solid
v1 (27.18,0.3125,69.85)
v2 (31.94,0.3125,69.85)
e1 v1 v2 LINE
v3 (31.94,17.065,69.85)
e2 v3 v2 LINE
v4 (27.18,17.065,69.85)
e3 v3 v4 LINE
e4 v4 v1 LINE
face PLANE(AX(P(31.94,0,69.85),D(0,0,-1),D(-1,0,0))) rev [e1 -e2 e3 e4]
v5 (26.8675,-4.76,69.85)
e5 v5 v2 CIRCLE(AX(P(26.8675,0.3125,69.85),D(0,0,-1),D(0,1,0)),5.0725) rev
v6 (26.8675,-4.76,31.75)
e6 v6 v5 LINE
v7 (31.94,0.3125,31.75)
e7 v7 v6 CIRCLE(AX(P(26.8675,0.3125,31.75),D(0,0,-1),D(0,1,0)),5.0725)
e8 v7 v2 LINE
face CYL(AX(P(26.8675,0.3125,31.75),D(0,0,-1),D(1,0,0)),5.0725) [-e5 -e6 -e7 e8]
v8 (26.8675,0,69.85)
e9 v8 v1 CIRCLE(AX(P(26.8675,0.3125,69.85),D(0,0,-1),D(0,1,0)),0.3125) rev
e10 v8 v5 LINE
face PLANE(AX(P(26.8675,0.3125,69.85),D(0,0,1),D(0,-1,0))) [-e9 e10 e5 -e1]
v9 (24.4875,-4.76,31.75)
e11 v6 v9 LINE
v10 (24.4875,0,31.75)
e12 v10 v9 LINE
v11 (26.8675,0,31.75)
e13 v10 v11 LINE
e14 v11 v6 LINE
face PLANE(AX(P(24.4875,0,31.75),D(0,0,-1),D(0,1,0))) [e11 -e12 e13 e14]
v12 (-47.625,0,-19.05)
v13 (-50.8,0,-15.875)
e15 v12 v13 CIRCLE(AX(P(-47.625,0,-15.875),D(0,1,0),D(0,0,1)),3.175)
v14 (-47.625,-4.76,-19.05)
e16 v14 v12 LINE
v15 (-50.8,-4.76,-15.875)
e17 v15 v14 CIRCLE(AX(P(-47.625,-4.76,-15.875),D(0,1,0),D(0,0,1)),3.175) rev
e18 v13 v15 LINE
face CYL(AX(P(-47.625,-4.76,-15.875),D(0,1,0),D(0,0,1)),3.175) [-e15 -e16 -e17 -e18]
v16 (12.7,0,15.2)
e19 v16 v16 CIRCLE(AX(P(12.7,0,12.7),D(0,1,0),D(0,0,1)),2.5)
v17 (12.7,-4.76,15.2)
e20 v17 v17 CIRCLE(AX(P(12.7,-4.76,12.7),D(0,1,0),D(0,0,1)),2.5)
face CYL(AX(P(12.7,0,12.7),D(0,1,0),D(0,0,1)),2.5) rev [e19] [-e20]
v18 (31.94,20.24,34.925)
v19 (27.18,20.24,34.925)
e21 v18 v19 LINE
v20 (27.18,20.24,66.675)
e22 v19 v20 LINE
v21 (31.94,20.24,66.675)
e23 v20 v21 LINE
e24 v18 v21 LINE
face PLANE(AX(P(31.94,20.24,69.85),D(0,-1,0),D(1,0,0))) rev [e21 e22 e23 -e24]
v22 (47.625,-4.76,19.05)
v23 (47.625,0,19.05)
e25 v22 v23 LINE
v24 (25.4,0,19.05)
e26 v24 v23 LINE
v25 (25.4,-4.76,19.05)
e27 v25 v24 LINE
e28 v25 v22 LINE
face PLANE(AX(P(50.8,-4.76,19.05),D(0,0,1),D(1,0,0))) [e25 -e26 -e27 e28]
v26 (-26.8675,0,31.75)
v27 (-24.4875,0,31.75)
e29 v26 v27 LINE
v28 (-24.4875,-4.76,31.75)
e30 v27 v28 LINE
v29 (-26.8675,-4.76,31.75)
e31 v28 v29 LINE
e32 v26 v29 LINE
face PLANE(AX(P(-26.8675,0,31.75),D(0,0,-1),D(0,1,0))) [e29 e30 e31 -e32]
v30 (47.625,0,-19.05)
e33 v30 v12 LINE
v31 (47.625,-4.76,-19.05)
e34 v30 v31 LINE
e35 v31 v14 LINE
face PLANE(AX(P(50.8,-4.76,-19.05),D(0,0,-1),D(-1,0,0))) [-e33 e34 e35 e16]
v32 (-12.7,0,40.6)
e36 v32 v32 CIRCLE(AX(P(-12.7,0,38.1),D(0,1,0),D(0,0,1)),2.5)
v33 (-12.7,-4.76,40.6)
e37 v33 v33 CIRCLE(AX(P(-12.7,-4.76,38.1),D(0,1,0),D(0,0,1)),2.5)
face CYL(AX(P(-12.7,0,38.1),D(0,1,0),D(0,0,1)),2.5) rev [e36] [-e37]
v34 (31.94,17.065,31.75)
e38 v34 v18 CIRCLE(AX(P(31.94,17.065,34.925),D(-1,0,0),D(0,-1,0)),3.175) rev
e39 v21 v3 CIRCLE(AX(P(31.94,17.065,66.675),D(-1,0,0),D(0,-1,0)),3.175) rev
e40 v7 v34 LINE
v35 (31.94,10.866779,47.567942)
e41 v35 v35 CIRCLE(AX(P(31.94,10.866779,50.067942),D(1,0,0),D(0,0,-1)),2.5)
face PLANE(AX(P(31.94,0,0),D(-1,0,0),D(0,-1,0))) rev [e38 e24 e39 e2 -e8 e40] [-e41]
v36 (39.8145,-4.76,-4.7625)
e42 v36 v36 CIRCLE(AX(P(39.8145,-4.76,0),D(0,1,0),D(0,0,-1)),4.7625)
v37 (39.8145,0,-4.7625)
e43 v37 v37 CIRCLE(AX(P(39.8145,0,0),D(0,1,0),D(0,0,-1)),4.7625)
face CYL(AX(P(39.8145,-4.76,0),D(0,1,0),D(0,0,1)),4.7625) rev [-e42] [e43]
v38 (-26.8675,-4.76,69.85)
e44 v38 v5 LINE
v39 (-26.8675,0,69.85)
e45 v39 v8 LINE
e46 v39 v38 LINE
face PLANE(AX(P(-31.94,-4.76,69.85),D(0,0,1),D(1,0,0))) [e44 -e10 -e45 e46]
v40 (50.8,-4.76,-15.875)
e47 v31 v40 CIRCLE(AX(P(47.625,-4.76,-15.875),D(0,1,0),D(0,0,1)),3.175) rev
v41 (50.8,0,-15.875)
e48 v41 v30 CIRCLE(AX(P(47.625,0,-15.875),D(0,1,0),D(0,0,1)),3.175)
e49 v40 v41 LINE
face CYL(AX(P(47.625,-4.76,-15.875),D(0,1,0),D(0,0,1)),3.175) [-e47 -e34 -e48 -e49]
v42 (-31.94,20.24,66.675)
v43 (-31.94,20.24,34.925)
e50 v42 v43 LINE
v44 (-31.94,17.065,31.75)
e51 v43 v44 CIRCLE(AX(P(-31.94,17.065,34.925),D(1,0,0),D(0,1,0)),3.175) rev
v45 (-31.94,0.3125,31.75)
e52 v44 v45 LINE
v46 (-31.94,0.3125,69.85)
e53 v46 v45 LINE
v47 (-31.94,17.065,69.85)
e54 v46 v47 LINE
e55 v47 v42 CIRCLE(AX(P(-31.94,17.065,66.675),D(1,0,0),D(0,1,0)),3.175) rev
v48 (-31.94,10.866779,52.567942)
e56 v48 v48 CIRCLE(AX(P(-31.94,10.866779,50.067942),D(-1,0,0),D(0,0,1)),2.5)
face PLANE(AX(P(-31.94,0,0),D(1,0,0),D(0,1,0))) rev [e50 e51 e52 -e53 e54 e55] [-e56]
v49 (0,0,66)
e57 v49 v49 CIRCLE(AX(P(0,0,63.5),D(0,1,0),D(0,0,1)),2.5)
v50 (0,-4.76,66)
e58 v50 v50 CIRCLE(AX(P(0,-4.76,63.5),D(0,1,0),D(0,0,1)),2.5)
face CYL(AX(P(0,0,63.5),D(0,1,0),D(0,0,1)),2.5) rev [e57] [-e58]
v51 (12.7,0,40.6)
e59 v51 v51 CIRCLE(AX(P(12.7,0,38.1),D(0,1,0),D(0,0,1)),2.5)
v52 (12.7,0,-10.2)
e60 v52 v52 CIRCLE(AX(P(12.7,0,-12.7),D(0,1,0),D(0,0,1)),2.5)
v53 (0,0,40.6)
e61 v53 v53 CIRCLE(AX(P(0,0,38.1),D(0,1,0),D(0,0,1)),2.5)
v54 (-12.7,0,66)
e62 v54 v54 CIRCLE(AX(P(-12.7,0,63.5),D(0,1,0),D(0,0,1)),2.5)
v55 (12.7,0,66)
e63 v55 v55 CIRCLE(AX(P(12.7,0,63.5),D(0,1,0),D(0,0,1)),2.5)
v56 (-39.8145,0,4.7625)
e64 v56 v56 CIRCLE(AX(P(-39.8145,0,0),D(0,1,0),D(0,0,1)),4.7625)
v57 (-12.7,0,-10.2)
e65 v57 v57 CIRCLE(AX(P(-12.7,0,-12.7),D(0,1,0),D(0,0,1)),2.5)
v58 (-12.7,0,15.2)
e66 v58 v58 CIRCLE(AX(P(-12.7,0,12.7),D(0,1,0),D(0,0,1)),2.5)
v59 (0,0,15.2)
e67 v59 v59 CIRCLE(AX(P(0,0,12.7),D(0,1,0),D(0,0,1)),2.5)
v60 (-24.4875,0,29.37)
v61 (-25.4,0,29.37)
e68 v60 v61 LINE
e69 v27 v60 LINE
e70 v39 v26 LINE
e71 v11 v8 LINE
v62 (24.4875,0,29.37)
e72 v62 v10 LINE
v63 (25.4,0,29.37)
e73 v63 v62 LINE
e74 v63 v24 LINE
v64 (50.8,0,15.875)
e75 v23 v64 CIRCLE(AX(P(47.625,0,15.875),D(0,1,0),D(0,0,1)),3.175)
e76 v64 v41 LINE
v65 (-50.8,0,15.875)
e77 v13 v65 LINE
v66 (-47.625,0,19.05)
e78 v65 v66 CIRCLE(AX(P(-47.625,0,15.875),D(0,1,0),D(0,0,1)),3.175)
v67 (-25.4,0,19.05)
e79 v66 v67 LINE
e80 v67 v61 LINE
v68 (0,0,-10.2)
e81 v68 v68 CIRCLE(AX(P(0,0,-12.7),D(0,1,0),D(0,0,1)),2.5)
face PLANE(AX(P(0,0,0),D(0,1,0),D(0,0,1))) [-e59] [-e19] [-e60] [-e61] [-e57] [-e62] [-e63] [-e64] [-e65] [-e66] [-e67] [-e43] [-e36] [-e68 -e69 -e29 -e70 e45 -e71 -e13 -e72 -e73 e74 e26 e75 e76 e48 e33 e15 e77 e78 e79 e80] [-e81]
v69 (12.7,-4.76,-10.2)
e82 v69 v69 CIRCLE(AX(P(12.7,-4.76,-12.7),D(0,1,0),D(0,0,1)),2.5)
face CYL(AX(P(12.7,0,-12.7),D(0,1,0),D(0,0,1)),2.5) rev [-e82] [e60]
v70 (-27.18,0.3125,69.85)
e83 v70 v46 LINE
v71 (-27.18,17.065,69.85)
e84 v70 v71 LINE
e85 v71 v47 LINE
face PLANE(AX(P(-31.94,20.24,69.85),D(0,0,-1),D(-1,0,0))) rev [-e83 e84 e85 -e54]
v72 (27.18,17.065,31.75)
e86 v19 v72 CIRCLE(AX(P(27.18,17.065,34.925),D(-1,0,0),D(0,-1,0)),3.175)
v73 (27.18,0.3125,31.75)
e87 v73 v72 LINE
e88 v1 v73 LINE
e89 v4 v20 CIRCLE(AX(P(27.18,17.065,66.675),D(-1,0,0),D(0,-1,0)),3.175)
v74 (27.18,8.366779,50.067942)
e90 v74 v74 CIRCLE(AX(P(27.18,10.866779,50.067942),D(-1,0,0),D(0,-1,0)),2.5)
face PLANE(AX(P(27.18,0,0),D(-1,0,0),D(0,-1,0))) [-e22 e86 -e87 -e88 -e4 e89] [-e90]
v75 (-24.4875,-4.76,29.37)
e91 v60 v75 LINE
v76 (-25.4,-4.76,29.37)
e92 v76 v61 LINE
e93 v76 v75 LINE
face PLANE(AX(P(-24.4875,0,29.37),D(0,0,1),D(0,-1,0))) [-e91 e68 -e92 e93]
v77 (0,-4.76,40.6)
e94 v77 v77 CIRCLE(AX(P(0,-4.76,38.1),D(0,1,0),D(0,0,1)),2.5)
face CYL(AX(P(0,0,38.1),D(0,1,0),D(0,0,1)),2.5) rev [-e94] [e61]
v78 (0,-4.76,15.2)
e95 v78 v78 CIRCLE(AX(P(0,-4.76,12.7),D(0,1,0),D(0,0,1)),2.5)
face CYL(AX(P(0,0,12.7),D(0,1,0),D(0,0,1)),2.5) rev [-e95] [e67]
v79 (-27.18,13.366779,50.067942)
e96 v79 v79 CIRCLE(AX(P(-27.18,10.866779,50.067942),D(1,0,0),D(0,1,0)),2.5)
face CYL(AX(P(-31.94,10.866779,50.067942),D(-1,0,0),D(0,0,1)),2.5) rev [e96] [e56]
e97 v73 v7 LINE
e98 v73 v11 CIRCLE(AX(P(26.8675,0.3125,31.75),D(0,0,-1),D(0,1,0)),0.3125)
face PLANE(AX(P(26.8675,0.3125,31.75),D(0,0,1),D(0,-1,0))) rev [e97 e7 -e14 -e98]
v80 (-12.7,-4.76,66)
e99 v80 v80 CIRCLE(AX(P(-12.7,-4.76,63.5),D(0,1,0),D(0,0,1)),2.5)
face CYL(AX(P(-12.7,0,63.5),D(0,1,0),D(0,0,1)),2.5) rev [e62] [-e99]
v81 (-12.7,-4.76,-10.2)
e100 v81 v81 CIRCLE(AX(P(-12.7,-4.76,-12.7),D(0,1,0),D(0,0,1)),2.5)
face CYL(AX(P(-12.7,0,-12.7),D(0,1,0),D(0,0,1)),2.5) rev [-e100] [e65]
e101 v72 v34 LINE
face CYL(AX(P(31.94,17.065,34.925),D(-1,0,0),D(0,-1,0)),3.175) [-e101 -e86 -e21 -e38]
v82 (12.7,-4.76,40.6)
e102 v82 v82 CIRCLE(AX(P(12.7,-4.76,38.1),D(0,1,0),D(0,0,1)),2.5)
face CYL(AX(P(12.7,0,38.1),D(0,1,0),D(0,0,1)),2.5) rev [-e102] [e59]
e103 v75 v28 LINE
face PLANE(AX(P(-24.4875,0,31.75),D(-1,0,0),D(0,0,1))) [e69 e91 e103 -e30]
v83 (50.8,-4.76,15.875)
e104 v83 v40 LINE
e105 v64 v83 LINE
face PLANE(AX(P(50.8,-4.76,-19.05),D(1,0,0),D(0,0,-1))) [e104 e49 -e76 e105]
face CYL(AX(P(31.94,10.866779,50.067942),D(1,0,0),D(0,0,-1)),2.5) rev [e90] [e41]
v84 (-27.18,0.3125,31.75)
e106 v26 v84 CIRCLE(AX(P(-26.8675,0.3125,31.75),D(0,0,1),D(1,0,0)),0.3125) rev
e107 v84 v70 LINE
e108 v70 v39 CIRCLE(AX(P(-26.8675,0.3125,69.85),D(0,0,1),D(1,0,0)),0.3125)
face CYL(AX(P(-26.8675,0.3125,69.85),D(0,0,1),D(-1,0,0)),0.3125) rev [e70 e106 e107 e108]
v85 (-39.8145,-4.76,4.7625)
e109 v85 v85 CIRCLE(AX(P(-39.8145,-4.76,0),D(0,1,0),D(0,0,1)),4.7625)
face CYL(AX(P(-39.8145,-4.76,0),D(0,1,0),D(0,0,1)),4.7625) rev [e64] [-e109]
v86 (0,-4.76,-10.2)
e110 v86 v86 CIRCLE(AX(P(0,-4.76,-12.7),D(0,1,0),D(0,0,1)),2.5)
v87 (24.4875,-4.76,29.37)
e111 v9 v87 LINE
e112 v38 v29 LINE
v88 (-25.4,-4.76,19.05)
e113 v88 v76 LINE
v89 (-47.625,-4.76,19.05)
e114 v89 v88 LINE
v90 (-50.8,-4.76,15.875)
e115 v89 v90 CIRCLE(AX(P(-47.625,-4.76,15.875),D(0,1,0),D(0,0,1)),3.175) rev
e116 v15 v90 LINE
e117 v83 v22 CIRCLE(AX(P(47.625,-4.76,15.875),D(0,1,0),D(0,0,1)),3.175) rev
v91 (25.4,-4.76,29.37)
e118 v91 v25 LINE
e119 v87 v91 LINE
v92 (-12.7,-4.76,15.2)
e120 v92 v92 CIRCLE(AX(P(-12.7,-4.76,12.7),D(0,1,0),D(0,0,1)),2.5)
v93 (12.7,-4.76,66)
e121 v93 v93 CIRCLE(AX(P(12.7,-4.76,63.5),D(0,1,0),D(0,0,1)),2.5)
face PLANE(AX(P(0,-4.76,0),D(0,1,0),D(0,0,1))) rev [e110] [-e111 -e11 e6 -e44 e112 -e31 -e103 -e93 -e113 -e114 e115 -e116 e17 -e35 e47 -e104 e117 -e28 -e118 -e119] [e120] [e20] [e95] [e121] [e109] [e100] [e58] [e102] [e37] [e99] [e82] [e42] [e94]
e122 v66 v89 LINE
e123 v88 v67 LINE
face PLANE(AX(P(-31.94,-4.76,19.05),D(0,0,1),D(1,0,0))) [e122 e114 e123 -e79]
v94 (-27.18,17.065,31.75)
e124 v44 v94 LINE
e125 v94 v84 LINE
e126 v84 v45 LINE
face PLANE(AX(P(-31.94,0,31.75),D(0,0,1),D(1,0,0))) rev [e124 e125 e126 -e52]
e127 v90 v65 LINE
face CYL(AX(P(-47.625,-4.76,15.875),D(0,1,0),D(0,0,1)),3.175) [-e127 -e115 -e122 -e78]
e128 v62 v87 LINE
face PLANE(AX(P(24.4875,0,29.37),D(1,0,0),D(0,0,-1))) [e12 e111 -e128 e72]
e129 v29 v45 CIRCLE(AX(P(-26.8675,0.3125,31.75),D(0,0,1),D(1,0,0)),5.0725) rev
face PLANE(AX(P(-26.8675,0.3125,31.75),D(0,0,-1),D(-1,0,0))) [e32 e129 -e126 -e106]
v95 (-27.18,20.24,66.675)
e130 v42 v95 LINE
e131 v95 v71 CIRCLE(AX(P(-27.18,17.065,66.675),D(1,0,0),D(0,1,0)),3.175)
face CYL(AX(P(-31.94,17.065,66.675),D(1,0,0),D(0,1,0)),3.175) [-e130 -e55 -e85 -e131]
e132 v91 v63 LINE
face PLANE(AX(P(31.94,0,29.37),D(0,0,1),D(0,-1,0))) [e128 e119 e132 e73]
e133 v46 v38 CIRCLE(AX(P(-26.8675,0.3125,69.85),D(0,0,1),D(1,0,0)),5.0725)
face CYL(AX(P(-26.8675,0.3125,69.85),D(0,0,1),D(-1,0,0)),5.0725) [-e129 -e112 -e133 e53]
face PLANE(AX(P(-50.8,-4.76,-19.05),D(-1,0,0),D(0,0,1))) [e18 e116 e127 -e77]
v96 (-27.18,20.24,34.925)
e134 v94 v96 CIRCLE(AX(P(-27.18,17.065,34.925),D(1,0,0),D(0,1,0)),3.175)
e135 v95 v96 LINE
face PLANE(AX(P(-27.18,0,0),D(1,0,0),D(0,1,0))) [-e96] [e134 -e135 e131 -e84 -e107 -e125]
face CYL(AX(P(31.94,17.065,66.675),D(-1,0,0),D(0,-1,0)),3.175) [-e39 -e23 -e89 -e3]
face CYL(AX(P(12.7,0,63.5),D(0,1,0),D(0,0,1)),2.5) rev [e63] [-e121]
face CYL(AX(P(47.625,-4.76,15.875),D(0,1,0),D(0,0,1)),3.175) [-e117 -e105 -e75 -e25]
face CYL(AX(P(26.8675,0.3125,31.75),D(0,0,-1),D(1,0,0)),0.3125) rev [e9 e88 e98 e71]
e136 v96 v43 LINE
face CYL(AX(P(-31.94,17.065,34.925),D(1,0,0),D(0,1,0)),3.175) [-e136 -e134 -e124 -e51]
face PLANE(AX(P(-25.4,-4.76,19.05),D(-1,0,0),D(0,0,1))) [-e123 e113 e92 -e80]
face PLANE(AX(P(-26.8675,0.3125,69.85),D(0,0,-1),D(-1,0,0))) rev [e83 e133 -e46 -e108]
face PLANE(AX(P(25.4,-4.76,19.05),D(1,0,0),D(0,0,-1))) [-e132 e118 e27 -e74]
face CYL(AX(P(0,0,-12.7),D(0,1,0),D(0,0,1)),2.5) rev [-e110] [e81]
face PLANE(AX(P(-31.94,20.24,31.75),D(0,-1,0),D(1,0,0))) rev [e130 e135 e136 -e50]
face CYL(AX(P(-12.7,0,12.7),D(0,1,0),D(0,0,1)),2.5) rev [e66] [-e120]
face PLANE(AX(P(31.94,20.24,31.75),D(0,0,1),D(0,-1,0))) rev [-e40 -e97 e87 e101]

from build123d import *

# Parameters (mm, degrees)
T_LE_DE_BASE_PLI_E1_DEPTH                = 4.76
T_LE_PLI_E_SUR_AR_TE1_STRIP_W            = 19.665
T_LE_PLI_E_SUR_AR_TE1_STRIP_H            = 4.76
T_LE_PLI_E_SUR_AR_TE1_STRIP_CUT_DEPTH    = 38.1
T_LE_PLI_E_SUR_AR_TE1_RELIEF_W           = 22.045
T_LE_PLI_E_SUR_AR_TE1_RELIEF_H           = 2.38
T_LE_PLI_E_SUR_AR_TE1_RELIEF_CUT_DEPTH   = 4.76
T_LE_PLI_E_SUR_AR_TE1_STRIP_2_W          = 19.665
T_LE_PLI_E_SUR_AR_TE1_STRIP_2_H          = 4.76
T_LE_PLI_E_SUR_AR_TE1_STRIP_CUT_2_DEPTH  = 38.1
T_LE_PLI_E_SUR_AR_TE1_RELIEF_2_W         = 22.045
T_LE_PLI_E_SUR_AR_TE1_RELIEF_2_H         = 2.38
T_LE_PLI_E_SUR_AR_TE1_RELIEF_CUT_2_DEPTH = 4.76
T_LE_PLI_E_SUR_AR_TE1_DEPTH              = 38.1
T_LE_PLI_E_SUR_AR_TE1_BEND_DEPTH         = 38.1
ENL_V_MAT_EXTRU_1_REACH                  = 90.709
ESQUISSE12_W                             = 6.54
ESQUISSE12_H                             = 10.32
CONG_1_R                                 = 3.175
ESQUISSE13_R                             = 4.7625
ENL_V_MAT_EXTRU_3_DEPTH                  = 89.709188363
DIAM_TRE_DU_PER_AGE_5_0_5_1_D            = 5
R_P_TITION_LIN_AIRE1_COUNT               = 4
R_P_TITION_LIN_AIRE1_PITCH               = 25.4
DIAM_TRE_DU_PER_AGE_5_0_5_2_D            = 5
DIAM_TRE_DU_PER_AGE_5_0_5_2_DEPTH        = 4.76
DIAM_TRE_DU_PER_AGE_5_0_5_3_D            = 5


# Sheet-metal steps are written as plain solids
with BuildPart() as part:
    # Esquisse1 → Tôle de base pliée1 (new body)
    with BuildSketch(Plane(origin=(0, 0, 0), x_dir=(1, 0, 0), z_dir=(0, 1, 0))):
        Polygon((-31.94, -19.05), (-31.94, -69.85), (31.94, -69.85), (31.94, -19.05), (50.8, -19.05), (50.8, 19.05), (-50.8, 19.05), (-50.8, -19.05), align=None)
    extrude(amount=-T_LE_DE_BASE_PLI_E1_DEPTH)

    # Tôle pliée sur arête1 strip (across the edge) → Tôle pliée sur arête1 strip cut (cut)
    with BuildSketch(Plane(origin=(-31.94, 0, 31.75), x_dir=(1, 0, 0), z_dir=(0, 0, 1))):
        with Locations((-4.76, -2.38)):
            Rectangle(T_LE_PLI_E_SUR_AR_TE1_STRIP_W, T_LE_PLI_E_SUR_AR_TE1_STRIP_H)
    extrude(amount=T_LE_PLI_E_SUR_AR_TE1_STRIP_CUT_DEPTH, mode=Mode.SUBTRACT)

    # Tôle pliée sur arête1 relief (on the sheet) → Tôle pliée sur arête1 relief cut (cut)
    with BuildSketch(Plane(origin=(-26.8675, 0, 31.75), x_dir=(1, 0, 0), z_dir=(0, 1, 0))):
        with Locations((-8.6425, 1.19)):
            Rectangle(T_LE_PLI_E_SUR_AR_TE1_RELIEF_W, T_LE_PLI_E_SUR_AR_TE1_RELIEF_H)
    extrude(amount=-T_LE_PLI_E_SUR_AR_TE1_RELIEF_CUT_DEPTH, mode=Mode.SUBTRACT)

    # Tôle pliée sur arête1 strip 2 (across the edge) → Tôle pliée sur arête1 strip cut 2 (cut)
    with BuildSketch(Plane(origin=(31.94, 0, 69.85), x_dir=(-1, 0, 0), z_dir=(0, 0, -1))):
        with Locations((-4.76, -2.38)):
            Rectangle(T_LE_PLI_E_SUR_AR_TE1_STRIP_2_W, T_LE_PLI_E_SUR_AR_TE1_STRIP_2_H)
    extrude(amount=T_LE_PLI_E_SUR_AR_TE1_STRIP_CUT_2_DEPTH, mode=Mode.SUBTRACT)

    # Tôle pliée sur arête1 relief 2 (on the sheet) → Tôle pliée sur arête1 relief cut 2 (cut)
    with BuildSketch(Plane(origin=(26.8675, 0, 69.85), x_dir=(-1, 0, 0), z_dir=(0, 1, 0))):
        with Locations((-8.6425, -39.29)):
            Rectangle(T_LE_PLI_E_SUR_AR_TE1_RELIEF_2_W, T_LE_PLI_E_SUR_AR_TE1_RELIEF_2_H)
    extrude(amount=-T_LE_PLI_E_SUR_AR_TE1_RELIEF_CUT_2_DEPTH, mode=Mode.SUBTRACT)

    # Tôle pliée sur arête1 section (across the edge) → Tôle pliée sur arête1 (add)
    with BuildSketch(Plane(origin=(-31.94, 0, 31.75), x_dir=(1, 0, 0), z_dir=(0, 0, 1))):
        with BuildLine():
            Line((0, 0.3125), (0, 20.24))
            Line((0, 20.24), (4.76, 20.24))
            Line((4.76, 20.24), (4.76, 0.3125))
            ThreePointArc((4.76, 0.3125), (4.851529131, 0.091529131), (5.0725, 0))
            Line((5.0725, 0), (5.0725, -4.76))
            ThreePointArc((5.0725, -4.76), (1.485700852, -3.274299148), (0, 0.3125))
        make_face()
    extrude(amount=T_LE_PLI_E_SUR_AR_TE1_DEPTH)

    # Tôle pliée sur arête1 section 2 (across the edge) → Tôle pliée sur arête1 bend (add)
    with BuildSketch(Plane(origin=(31.94, 0, 69.85), x_dir=(-1, 0, 0), z_dir=(0, 0, -1))):
        with BuildLine():
            Line((0, 0.3125), (0, 20.24))
            Line((0, 20.24), (4.76, 20.24))
            Line((4.76, 20.24), (4.76, 0.3125))
            ThreePointArc((4.76, 0.3125), (4.851529131, 0.091529131), (5.0725, 0))
            Line((5.0725, 0), (5.0725, -4.76))
            ThreePointArc((5.0725, -4.76), (1.485700852, -3.274299148), (0, 0.3125))
        make_face()
    extrude(amount=T_LE_PLI_E_SUR_AR_TE1_BEND_DEPTH)

    # Esquisse12 → Enlèv. mat.-Extru.1 (cut, up to next)
    with BuildSketch(Plane(origin=(0, 0, 0), x_dir=(1, 0, 0), z_dir=(0, 1, 0)), mode=Mode.PRIVATE) as enl_v_mat_extru_1_sk1:
        with Locations((-28.67, -24.21)):
            Rectangle(ESQUISSE12_W, ESQUISSE12_H)
    enl_v_mat_extru_1_tool1 = extrude(enl_v_mat_extru_1_sk1.sketch, amount=-ENL_V_MAT_EXTRU_1_REACH, mode=Mode.PRIVATE) & part.part
    # Esquisse12 → Enlèv. mat.-Extru.1 (cut, up to next)
    with BuildSketch(Plane(origin=(0, 0, 0), x_dir=(1, 0, 0), z_dir=(0, 1, 0)), mode=Mode.PRIVATE) as enl_v_mat_extru_1_sk2:
        with Locations((28.67, -24.21)):
            Rectangle(ESQUISSE12_W, ESQUISSE12_H)
    enl_v_mat_extru_1_tool2 = extrude(enl_v_mat_extru_1_sk2.sketch, amount=-ENL_V_MAT_EXTRU_1_REACH, mode=Mode.PRIVATE) & part.part
    add(enl_v_mat_extru_1_tool1.solids().sort_by_distance((-28.67, 0, 24.21))[0], mode=Mode.SUBTRACT)
    add(enl_v_mat_extru_1_tool2.solids().sort_by_distance((28.67, 0, 24.21))[0], mode=Mode.SUBTRACT)

    # Congé1
    cong_1_edges = [part.edges().sort_by_distance(p)[0] for p in [
        (-50.8, -2.38, 19.05),
        (-50.8, -2.38, -19.05),
        (50.8, -2.38, -19.05),
        (50.8, -2.38, 19.05),
        (-29.56, 20.24, 31.75),
        (-29.56, 20.24, 69.85),
        (29.56, 20.24, 69.85),
        (29.56, 20.24, 31.75),
    ]]
    fillet(cong_1_edges, radius=CONG_1_R)

    # Esquisse13 → Enlèv. mat.-Extru.3 (cut, through all)
    with BuildSketch(Plane(origin=(0, 0, 0), x_dir=(1, 0, 0), z_dir=(0, 1, 0))):
        with Locations(Location((-39.8145, 0, 0), (0, 0, 270))):
            Circle(ESQUISSE13_R)
        with Locations(Location((39.8145, 0, 0), (0, 0, 90))):
            Circle(ESQUISSE13_R)
    extrude(amount=-ENL_V_MAT_EXTRU_3_DEPTH, mode=Mode.SUBTRACT)

    # Diamètre du perçage Ø5.0 (5)1 (through all)
    with Locations(Plane(origin=(0, 0, 0), x_dir=(1, 0, 0), z_dir=(0, 1, 0))):
        with Locations((-12.7, 12.7), (0, 12.7), (12.7, 12.7)):
            diam_tre_du_per_age_5_0_5_1 = Hole(DIAM_TRE_DU_PER_AGE_5_0_5_1_D / 2)

    # Répétition linéaire1: Diamètre du perçage Ø5.0 (5)1 ×4
    with Locations(*[(0, 0, i * R_P_TITION_LIN_AIRE1_PITCH) for i in range(1, R_P_TITION_LIN_AIRE1_COUNT)]):
        add(diam_tre_du_per_age_5_0_5_1, mode=Mode.SUBTRACT)

    # Diamètre du perçage Ø5.0 (5)2
    with Locations(Plane.ZY.offset(31.94)):
        with Locations((50.06794197, 10.866778695), (38.47565905, -37.875384173)):
            Hole(DIAM_TRE_DU_PER_AGE_5_0_5_2_D / 2, depth=DIAM_TRE_DU_PER_AGE_5_0_5_2_DEPTH)

    # Diamètre du perçage Ø5.0 (5)3 (through all)
    with Locations(Plane(origin=(31.94, 0, 0), x_dir=(0, 0, -1), z_dir=(1, 0, 0))):
        with Locations((-50.06794197, 10.866778695)):
            Hole(DIAM_TRE_DU_PER_AGE_5_0_5_3_D / 2)


solid = part.part
